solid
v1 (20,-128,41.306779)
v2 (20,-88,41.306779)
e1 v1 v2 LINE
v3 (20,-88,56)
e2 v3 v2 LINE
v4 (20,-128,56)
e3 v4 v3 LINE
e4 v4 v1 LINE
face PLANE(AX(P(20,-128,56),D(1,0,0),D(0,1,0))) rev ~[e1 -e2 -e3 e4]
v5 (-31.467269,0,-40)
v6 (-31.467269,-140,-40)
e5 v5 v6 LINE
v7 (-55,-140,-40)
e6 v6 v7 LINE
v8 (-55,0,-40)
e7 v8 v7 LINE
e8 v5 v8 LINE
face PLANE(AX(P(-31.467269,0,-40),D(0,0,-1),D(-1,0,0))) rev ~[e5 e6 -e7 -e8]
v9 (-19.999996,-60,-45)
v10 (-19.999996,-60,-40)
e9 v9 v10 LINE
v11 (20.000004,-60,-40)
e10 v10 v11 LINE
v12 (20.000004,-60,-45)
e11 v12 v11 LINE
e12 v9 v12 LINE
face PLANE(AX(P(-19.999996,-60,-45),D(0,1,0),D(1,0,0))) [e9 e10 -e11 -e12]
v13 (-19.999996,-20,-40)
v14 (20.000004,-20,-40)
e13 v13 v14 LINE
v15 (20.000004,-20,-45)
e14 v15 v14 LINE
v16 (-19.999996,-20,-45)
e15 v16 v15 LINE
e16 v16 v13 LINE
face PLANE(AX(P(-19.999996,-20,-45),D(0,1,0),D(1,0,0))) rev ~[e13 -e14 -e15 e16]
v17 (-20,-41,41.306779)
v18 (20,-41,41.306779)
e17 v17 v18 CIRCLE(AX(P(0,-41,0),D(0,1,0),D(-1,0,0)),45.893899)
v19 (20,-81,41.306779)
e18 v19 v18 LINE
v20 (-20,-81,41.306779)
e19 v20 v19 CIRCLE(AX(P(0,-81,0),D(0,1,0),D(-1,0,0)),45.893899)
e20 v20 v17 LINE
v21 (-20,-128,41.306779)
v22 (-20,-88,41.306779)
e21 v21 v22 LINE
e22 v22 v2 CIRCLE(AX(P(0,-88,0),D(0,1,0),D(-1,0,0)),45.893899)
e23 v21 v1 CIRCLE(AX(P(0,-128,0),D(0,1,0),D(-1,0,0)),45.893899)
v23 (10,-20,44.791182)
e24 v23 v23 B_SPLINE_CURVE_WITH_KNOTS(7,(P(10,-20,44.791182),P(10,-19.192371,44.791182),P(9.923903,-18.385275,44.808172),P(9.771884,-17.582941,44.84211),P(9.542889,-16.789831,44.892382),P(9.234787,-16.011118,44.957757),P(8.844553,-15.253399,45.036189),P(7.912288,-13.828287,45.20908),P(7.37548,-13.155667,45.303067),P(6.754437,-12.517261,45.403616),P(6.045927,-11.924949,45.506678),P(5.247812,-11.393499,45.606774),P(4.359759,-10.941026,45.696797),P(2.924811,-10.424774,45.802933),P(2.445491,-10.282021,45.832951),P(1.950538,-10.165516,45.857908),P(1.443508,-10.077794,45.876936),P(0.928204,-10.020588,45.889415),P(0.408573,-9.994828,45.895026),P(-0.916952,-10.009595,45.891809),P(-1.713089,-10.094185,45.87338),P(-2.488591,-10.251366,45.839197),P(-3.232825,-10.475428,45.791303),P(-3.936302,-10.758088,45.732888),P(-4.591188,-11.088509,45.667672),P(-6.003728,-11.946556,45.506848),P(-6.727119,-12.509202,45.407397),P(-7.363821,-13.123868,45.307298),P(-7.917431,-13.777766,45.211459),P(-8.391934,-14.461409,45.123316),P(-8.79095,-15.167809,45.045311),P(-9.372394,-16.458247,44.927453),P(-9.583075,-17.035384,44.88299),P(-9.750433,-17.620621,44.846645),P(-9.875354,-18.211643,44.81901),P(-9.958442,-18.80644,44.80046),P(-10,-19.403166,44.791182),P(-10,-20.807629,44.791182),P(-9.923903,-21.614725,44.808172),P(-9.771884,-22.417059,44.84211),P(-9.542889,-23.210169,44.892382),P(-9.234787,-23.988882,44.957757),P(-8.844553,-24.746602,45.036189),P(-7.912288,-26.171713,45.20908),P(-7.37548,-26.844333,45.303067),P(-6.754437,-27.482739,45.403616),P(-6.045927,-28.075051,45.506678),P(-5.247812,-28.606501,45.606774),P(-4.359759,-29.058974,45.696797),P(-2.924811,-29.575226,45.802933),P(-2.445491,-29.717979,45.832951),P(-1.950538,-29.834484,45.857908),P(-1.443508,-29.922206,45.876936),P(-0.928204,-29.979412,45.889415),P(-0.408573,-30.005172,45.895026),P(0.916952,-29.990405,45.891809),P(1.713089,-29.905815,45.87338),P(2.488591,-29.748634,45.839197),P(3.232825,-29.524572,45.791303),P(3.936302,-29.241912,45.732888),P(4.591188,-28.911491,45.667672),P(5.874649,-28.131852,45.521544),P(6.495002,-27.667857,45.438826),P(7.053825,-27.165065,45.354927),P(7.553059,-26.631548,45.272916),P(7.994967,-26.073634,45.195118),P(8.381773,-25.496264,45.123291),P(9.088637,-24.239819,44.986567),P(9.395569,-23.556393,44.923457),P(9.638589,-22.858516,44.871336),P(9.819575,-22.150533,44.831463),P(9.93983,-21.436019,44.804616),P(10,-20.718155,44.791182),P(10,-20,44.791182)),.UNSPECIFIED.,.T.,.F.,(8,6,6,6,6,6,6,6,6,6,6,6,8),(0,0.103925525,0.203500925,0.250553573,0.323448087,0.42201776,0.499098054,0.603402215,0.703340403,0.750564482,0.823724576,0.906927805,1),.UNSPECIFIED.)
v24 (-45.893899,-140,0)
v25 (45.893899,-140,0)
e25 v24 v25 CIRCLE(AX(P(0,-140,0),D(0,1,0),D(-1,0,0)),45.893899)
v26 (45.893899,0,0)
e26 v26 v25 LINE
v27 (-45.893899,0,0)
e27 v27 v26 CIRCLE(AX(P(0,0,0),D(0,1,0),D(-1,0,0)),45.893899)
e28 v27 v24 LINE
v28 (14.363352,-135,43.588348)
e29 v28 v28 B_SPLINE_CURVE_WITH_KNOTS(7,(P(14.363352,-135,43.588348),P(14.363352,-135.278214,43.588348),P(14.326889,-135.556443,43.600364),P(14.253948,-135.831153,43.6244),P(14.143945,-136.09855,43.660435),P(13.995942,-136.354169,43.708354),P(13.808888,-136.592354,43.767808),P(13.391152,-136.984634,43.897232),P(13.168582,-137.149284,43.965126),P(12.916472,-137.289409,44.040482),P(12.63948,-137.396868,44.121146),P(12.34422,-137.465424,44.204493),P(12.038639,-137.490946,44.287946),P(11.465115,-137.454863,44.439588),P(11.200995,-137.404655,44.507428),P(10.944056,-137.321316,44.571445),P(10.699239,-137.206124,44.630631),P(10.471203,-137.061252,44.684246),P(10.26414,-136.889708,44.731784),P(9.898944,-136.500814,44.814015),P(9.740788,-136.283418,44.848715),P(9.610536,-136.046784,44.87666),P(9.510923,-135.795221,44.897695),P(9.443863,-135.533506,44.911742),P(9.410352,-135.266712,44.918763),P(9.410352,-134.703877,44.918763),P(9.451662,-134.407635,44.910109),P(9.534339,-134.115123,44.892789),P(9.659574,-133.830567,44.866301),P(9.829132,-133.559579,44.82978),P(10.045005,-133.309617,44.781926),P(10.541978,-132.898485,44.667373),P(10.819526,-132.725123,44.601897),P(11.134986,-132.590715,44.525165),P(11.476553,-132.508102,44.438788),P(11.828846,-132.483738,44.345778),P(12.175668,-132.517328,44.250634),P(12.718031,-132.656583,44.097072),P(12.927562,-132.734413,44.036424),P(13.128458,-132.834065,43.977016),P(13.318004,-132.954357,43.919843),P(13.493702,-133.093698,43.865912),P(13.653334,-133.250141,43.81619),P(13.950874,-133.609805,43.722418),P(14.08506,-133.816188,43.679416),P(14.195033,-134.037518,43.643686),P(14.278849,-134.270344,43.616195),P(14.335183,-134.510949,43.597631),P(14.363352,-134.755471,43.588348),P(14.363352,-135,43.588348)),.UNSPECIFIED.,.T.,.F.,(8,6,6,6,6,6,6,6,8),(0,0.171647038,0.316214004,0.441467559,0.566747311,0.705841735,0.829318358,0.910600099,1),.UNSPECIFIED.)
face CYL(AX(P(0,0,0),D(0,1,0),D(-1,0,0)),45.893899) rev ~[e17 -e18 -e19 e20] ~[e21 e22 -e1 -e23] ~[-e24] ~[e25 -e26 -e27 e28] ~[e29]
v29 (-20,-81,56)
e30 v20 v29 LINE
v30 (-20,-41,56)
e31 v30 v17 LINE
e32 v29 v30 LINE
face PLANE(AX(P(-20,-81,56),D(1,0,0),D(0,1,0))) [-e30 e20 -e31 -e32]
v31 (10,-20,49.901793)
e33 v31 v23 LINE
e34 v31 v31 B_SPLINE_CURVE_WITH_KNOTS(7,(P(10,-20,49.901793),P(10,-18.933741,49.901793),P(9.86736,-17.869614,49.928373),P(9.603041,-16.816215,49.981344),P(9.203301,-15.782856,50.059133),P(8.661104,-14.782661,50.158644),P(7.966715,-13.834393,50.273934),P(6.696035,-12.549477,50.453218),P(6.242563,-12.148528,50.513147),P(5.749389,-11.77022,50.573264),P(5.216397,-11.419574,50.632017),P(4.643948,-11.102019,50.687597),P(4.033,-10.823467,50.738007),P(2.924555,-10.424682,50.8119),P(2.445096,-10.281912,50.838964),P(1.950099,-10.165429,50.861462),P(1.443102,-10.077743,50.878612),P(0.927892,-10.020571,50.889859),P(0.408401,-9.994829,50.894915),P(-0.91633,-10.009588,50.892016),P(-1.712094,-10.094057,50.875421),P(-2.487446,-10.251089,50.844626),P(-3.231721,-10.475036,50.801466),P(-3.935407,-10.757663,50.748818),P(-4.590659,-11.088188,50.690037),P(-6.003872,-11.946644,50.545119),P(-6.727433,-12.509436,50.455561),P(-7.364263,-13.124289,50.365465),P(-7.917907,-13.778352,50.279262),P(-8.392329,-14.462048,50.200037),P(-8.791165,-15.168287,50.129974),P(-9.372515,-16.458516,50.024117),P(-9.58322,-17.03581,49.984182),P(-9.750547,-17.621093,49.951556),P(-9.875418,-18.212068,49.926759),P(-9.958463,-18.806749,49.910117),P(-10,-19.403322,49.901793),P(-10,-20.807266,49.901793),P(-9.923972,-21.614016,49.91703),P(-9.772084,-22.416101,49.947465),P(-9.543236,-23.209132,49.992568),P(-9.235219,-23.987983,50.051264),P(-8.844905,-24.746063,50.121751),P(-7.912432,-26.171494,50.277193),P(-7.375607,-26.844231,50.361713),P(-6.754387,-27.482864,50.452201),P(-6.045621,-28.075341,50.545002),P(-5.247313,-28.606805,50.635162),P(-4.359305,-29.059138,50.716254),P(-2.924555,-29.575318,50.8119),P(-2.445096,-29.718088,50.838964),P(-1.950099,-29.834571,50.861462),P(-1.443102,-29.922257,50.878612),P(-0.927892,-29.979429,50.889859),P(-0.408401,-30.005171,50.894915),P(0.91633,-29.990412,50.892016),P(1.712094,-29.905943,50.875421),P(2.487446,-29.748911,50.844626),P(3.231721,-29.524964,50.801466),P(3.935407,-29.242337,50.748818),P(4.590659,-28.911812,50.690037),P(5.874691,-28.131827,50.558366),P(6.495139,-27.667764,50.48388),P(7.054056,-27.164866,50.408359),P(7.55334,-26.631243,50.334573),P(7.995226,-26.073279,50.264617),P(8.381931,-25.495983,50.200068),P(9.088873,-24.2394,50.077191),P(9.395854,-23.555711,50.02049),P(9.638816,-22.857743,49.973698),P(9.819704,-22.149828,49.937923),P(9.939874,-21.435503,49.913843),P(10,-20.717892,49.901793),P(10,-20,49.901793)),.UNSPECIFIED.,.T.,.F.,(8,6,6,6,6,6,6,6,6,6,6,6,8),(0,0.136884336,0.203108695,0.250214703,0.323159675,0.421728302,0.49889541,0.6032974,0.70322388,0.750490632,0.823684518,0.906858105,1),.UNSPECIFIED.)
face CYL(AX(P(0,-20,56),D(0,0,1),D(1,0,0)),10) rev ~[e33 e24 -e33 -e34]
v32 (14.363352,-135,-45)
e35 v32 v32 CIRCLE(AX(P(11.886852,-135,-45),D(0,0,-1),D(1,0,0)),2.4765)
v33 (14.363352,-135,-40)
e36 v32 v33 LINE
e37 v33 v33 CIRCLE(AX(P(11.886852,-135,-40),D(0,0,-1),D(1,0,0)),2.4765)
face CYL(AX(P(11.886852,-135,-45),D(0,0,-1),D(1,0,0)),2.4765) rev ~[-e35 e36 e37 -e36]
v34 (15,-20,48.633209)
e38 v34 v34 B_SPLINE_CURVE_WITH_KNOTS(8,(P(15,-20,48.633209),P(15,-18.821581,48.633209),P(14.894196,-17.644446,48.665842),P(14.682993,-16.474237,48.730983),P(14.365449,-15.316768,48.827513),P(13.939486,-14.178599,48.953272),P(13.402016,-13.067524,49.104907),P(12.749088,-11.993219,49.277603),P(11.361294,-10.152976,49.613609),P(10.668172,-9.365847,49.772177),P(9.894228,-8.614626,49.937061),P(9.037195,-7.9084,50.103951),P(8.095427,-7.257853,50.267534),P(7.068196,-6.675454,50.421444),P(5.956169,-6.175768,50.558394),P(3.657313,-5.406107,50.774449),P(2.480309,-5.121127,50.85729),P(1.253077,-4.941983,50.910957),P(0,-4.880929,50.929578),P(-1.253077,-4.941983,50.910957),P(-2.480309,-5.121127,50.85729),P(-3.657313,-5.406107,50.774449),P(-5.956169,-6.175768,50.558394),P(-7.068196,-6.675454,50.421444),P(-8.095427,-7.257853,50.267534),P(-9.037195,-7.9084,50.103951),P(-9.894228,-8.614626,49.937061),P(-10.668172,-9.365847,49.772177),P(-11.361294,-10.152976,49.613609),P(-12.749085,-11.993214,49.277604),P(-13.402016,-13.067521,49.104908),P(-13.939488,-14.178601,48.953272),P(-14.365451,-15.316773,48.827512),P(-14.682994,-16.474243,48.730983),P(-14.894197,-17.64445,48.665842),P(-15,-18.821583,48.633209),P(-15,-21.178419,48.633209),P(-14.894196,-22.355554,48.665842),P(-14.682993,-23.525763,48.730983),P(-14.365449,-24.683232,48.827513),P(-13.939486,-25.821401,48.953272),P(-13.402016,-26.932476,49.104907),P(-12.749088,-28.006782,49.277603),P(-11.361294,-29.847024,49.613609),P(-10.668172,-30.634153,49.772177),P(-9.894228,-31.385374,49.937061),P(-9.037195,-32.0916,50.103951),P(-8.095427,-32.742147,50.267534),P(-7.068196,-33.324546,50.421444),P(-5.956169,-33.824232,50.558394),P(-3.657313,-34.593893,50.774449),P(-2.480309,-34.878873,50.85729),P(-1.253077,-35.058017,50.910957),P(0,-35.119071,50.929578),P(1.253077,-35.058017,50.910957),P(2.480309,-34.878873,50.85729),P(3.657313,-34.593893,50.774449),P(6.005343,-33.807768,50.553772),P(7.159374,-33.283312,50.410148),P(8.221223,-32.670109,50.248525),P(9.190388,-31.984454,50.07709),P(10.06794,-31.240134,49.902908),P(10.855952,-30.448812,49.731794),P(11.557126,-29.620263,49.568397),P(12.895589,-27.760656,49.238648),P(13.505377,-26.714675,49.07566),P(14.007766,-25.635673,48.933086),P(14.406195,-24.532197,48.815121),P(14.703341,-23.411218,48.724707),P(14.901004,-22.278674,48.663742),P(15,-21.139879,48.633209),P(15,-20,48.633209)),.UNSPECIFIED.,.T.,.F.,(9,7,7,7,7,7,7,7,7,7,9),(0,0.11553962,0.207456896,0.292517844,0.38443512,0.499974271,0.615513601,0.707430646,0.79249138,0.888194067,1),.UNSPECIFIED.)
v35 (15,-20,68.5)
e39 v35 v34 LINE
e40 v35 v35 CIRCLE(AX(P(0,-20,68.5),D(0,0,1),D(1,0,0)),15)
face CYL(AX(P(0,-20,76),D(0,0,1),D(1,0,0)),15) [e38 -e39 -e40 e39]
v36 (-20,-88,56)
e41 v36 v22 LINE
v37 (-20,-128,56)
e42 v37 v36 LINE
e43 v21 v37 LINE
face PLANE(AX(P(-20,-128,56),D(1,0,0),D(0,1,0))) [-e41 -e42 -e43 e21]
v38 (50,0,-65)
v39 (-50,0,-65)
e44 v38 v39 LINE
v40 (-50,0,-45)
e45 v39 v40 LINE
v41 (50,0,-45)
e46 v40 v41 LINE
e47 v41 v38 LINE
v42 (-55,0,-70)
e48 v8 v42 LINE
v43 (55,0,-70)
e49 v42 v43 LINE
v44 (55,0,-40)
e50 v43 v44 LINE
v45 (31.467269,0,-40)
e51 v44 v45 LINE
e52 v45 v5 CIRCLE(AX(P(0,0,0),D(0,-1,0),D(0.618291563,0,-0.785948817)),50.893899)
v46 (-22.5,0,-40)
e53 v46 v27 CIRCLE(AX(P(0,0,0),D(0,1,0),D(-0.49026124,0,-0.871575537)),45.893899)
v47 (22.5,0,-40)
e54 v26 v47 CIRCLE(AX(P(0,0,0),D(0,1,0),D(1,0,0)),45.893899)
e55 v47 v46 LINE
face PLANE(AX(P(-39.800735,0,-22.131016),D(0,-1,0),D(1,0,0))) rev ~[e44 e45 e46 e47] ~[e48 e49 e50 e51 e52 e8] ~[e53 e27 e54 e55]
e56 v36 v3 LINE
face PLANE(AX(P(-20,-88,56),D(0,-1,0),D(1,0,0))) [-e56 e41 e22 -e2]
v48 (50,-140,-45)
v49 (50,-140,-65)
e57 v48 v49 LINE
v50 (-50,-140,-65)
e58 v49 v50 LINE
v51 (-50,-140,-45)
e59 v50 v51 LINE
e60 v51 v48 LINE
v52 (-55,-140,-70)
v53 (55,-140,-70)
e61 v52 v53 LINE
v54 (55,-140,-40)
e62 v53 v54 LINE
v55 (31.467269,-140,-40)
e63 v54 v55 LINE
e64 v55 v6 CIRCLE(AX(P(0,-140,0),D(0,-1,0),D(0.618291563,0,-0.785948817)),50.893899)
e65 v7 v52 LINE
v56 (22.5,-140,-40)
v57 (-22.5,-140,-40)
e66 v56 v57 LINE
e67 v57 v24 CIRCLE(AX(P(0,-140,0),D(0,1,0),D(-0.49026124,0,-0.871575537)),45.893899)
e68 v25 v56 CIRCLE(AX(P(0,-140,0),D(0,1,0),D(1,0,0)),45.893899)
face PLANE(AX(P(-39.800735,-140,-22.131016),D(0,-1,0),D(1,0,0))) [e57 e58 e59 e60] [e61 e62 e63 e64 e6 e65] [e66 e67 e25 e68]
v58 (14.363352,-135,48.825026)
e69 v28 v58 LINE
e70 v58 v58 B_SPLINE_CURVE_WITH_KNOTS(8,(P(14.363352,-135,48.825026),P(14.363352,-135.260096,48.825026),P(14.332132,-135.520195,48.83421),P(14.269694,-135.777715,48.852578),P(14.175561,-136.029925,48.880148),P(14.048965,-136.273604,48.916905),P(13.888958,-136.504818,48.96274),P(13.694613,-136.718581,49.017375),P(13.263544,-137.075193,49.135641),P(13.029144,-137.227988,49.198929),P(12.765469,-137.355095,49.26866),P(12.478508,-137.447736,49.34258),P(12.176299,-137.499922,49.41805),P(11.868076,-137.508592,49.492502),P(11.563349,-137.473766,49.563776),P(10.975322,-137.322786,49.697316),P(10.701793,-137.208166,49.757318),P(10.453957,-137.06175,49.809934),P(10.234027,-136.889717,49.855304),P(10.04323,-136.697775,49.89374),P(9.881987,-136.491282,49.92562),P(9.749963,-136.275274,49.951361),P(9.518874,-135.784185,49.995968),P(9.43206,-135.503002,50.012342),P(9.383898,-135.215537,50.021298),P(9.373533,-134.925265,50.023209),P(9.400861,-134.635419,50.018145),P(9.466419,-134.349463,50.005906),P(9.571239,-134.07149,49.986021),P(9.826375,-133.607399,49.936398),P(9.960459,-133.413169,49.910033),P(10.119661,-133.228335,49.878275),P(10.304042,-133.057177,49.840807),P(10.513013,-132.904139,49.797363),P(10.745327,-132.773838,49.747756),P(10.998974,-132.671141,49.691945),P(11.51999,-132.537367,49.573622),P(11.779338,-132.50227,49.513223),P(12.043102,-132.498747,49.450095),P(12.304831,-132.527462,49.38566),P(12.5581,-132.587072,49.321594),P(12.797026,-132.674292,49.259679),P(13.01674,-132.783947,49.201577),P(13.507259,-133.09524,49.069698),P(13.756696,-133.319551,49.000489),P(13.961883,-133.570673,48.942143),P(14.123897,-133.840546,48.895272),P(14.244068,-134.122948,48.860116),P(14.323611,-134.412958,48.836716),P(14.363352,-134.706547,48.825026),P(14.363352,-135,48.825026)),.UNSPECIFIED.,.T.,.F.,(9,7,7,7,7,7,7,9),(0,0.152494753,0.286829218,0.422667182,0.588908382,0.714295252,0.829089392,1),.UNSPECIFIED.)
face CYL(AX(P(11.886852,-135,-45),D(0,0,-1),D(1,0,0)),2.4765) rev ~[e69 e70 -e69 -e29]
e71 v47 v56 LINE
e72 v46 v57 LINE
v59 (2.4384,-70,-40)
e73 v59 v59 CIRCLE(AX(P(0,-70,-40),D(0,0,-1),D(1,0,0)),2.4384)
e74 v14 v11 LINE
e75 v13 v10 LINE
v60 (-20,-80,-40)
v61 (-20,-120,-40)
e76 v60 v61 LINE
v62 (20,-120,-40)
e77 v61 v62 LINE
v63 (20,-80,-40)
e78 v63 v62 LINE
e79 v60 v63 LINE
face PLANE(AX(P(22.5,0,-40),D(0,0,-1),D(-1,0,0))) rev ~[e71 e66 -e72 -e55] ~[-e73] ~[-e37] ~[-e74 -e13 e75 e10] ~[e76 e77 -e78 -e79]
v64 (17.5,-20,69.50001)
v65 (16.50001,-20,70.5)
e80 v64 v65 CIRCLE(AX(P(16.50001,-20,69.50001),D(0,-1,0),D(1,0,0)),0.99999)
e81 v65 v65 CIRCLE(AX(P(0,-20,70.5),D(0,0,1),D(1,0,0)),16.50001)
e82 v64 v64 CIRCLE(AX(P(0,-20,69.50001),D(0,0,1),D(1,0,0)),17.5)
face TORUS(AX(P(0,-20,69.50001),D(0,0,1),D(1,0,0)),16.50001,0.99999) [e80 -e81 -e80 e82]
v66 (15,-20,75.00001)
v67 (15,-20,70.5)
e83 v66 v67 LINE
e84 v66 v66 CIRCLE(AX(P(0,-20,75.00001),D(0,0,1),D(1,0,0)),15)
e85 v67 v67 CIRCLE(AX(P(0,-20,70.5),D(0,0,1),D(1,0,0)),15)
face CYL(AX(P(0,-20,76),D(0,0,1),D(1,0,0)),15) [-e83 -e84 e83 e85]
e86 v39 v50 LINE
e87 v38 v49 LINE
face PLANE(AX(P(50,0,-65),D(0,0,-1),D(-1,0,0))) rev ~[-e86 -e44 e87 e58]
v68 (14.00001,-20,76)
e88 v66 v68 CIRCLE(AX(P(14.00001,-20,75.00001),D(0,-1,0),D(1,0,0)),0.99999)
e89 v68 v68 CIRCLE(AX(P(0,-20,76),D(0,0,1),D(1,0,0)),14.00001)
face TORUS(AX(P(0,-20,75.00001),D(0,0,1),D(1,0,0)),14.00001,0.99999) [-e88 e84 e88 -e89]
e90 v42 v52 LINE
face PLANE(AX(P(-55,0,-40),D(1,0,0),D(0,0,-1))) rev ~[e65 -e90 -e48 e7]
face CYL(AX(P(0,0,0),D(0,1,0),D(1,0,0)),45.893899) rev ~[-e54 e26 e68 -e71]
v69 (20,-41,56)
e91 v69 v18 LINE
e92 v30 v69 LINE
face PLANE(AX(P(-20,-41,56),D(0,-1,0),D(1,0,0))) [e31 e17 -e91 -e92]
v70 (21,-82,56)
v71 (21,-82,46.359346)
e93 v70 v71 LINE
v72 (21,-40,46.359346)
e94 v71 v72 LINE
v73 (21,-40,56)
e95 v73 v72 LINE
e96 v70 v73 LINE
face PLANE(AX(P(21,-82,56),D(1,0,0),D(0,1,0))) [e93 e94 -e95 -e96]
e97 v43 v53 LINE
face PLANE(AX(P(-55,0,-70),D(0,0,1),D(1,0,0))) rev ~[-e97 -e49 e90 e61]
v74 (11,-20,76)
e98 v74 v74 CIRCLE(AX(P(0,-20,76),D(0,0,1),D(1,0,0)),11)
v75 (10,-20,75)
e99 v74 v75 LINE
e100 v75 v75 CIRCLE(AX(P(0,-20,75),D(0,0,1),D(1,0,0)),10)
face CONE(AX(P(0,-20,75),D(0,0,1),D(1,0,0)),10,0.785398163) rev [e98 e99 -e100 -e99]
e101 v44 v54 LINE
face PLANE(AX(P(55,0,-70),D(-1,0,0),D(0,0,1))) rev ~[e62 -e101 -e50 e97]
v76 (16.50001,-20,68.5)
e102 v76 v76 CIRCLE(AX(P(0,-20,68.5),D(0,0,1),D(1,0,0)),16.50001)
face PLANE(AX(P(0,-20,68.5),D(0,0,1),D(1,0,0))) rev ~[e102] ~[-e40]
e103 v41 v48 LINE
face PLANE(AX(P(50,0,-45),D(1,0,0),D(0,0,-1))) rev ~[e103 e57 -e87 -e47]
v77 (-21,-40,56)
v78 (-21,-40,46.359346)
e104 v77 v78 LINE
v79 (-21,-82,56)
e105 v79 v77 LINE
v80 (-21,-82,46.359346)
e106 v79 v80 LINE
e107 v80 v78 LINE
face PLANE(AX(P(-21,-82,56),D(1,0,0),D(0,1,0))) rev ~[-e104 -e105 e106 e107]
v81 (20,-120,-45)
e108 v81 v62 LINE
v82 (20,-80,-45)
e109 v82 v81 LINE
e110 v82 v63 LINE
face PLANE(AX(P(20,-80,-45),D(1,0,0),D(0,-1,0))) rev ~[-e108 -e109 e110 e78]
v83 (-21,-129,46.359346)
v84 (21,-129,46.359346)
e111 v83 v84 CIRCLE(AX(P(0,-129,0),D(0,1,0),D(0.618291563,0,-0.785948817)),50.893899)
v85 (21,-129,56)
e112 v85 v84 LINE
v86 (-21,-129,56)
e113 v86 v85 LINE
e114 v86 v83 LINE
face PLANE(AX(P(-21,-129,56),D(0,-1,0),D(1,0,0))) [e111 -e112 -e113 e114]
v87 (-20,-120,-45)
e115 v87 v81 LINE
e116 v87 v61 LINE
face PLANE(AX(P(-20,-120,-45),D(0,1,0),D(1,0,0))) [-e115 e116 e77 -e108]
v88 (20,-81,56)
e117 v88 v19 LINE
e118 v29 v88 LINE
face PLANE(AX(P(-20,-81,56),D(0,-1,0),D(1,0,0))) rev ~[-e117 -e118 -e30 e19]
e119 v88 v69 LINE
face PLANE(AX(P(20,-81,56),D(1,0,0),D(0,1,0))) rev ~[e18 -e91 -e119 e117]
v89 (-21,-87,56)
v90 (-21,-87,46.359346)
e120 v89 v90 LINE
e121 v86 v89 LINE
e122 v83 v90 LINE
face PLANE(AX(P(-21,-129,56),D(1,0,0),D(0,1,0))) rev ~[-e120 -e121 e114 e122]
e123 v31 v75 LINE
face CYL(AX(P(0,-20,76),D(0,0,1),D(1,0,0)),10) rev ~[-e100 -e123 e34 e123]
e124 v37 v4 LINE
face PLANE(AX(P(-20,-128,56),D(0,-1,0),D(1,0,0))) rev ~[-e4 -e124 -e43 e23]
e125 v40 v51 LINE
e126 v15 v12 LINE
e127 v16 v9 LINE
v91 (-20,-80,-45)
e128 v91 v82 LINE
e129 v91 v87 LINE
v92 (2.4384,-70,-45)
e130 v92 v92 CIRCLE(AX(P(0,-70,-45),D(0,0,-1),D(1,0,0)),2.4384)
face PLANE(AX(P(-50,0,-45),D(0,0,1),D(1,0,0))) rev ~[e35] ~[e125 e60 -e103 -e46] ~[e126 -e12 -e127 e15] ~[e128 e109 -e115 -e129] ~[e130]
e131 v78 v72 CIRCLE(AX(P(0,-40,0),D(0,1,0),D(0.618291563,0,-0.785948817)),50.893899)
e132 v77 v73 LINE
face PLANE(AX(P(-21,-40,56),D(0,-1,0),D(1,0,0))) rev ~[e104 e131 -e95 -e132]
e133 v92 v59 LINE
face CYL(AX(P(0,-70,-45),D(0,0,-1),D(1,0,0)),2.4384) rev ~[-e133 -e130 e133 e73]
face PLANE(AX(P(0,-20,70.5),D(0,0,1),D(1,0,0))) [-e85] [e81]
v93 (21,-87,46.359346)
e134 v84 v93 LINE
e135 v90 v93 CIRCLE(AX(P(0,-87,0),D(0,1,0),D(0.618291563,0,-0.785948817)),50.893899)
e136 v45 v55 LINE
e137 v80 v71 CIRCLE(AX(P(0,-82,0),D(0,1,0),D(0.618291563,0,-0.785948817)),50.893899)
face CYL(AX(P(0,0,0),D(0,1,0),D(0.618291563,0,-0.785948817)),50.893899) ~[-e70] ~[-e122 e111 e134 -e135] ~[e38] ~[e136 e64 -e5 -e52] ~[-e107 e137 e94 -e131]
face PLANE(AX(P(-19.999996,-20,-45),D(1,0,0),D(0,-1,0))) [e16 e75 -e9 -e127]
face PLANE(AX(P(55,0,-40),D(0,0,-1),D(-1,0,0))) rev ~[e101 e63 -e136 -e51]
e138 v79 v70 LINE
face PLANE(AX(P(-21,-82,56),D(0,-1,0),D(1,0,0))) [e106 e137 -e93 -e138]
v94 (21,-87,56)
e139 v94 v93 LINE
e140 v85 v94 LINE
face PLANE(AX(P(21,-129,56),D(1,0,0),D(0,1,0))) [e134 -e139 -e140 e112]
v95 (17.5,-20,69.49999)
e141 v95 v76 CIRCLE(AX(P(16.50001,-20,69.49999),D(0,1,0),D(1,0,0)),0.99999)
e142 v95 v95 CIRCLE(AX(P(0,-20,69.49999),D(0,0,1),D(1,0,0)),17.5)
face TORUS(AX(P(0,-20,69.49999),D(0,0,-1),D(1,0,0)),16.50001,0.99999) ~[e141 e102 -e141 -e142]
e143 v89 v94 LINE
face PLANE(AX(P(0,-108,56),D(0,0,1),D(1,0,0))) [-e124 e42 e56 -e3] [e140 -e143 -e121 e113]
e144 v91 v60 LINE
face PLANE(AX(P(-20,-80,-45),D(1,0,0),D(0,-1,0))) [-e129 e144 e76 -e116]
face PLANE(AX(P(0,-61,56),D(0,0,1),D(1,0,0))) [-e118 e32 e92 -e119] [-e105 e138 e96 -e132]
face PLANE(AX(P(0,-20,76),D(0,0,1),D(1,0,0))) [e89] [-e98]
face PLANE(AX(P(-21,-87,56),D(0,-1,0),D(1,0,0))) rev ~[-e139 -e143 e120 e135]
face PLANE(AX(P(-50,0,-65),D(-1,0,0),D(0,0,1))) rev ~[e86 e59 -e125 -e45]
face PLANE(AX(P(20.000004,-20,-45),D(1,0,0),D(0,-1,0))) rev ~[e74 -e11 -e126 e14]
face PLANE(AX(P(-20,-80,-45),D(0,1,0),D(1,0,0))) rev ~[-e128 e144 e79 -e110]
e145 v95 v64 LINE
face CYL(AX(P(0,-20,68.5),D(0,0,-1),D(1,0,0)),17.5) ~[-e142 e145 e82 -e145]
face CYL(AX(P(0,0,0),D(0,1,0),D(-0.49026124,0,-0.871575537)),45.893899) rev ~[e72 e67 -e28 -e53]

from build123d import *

# Parameters (mm, degrees)
F0_W      = 5
F0_H      = 5
F1_DEPTH  = 140
F5_R      = 15
F5_R_2    = 10
F6_DEPTH  = 30
F7_R      = 10
F8_DEPTH  = 25
F7_W      = 42
F7_H      = 42
F7_W_2    = 40
F7_H_2    = 40
F9_DEPTH  = 10
F10_DEPTH = 25
F11_W     = 40
F11_H     = 40
F11_R     = 2.4384
F11_R_2   = 2.4765
F12_DEPTH = 25
F13_DEPTH = 100
F15_R     = 17.5
F15_R_2   = 10
F16_DEPTH = 2
F17_R     = 0.99999
F18_SIZE  = 1


# Not quite as in the source:
# - a fillet or chamfer is up to 0.001 mm smaller than in the source, because OpenCascade refuses the exact size


with BuildPart() as f1:
    # F0 (on Front) → F1 (new body)
    with BuildSketch(Plane.XZ):
        with BuildLine():
            ThreePointArc((-22.5, -40), (-39.6160493738, -23.1693468188), (-45.8938993767, 0))
            Line((-45.8938993767, 0), (-50.8938993767, 0))
            ThreePointArc((-50.8938993767, 0), (-45.7803505669, -22.233949171), (-31.4672686099, -40))
            Line((-31.4672686099, -40), (-22.5, -40))
        make_face()
        with BuildLine():
            ThreePointArc((-9.0138781887, -45), (-15.954031767, -43.0316031583), (-22.5, -40))
            Line((-22.5, -40), (-31.4672686099, -40))
            ThreePointArc((-31.4672686099, -40), (-27.7333960958, -42.6737358894), (-23.7737038294, -45))
            Line((-23.7737038294, -45), (-9.0138781887, -45))
        make_face()
        with BuildLine():
            ThreePointArc((-45.8938993767, 0), (0, 45.8938993767), (45.8938993767, 0))
            Line((45.8938993767, 0), (50.8938993767, 0))
            ThreePointArc((50.8938993767, 0), (0, 50.8938993767), (-50.8938993767, 0))
            Line((-50.8938993767, 0), (-45.8938993767, 0))
        make_face()
        with BuildLine():
            Line((50.8938993767, 0), (45.8938993767, 0))
            ThreePointArc((45.8938993767, 0), (39.6160493738, -23.1693468188), (22.5, -40))
            Line((22.5, -40), (31.4672686099, -40))
            ThreePointArc((31.4672686099, -40), (45.7803505669, -22.233949171), (50.8938993767, 0))
        make_face()
        with Locations((-52.5, -67.5)):
            Rectangle(F0_W, F0_H)
        with BuildLine():
            ThreePointArc((-23.7737038294, -45), (-27.7333960958, -42.6737358894), (-31.4672686099, -40))
            Line((-31.4672686099, -40), (-55, -40))
            Line((-55, -40), (-55, -65))
            Line((-55, -65), (-50, -65))
            Line((-50, -65), (-50, -45))
            Line((-50, -45), (-23.7737038294, -45))
        make_face()
        with BuildLine():
            Line((55, -40), (31.4672686099, -40))
            ThreePointArc((31.4672686099, -40), (27.7333960958, -42.6737358894), (23.7737038294, -45))
            Line((23.7737038294, -45), (50, -45))
            Line((50, -45), (50, -65))
            Line((50, -65), (-50, -65))
            Line((-50, -65), (-50, -70))
            Line((-50, -70), (55, -70))
            Line((55, -70), (55, -40))
        make_face()
        with BuildLine():
            ThreePointArc((9.0138781887, -45), (15.954031767, -43.0316031583), (22.5, -40))
            Line((22.5, -40), (0, -40))
            Line((0, -40), (-22.5, -40))
            ThreePointArc((-22.5, -40), (-15.954031767, -43.0316031583), (-9.0138781887, -45))
            Line((-9.0138781887, -45), (9.0138781887, -45))
        make_face()
        with BuildLine():
            Line((31.4672686099, -40), (22.5, -40))
            ThreePointArc((22.5, -40), (15.954031767, -43.0316031583), (9.0138781887, -45))
            Line((9.0138781887, -45), (23.7737038294, -45))
            ThreePointArc((23.7737038294, -45), (27.7333960958, -42.6737358894), (31.4672686099, -40))
        make_face()
    extrude(amount=F1_DEPTH)

    # F5 (on offset) → F6 (join)
    with BuildSketch(Plane.XY.offset(76)):
        with Locations((0, -20)):
            Circle(F5_R)
        with Locations((0, -20)):
            Circle(F5_R_2, mode=Mode.SUBTRACT)
    extrude(amount=-F6_DEPTH)

    # F7 (on offset) → F8 (cut)
    with BuildSketch(Plane.XY.offset(56)):
        with Locations((0, -20)):
            Circle(F7_R)
    extrude(amount=-F8_DEPTH, mode=Mode.SUBTRACT)

    # F7 (on offset) → F9 (join)
    with BuildSketch(Plane.XY.offset(56)):
        with Locations((0, -61)):
            Rectangle(F7_W, F7_H)
        with Locations((0, -61)):
            Rectangle(F7_W_2, F7_H_2, mode=Mode.SUBTRACT)
        with Locations((0, -108)):
            Rectangle(F7_W, F7_H)
        with Locations((0, -108)):
            Rectangle(F7_W_2, F7_H_2, mode=Mode.SUBTRACT)
    extrude(amount=-F9_DEPTH)

    # F7 (on offset) → F10 (cut)
    with BuildSketch(Plane.XY.offset(56)):
        with Locations((0, -61)):
            Rectangle(F7_W_2, F7_H_2)
        with Locations((0, -108)):
            Rectangle(F7_W_2, F7_H_2)
    extrude(amount=-F10_DEPTH, mode=Mode.SUBTRACT)

    # F11 (on face) → F12 (cut)
    with BuildSketch(Plane(origin=(0, 0, -45), x_dir=(1, 0, 0), z_dir=(0, 0, -1))):
        with Locations((3.8294e-06, 40)):
            Rectangle(F11_W, F11_H)
        with Locations((0, 100)):
            Rectangle(F11_W, F11_H)
        with Locations((0, 70)):
            Circle(F11_R)
        with Locations((11.8868519147, 135)):
            Circle(F11_R_2)
    extrude(amount=-F12_DEPTH, mode=Mode.SUBTRACT)

    # F11 (on face) → F13 (cut)
    with BuildSketch(Plane(origin=(0, 0, -45), x_dir=(1, 0, 0), z_dir=(0, 0, -1))):
        with Locations((11.8868519147, 135)):
            Circle(F11_R_2)
    extrude(amount=-F13_DEPTH, mode=Mode.SUBTRACT)

    # F15 (on offset) → F16 (join)
    with BuildSketch(Plane.XY.offset(68.5)):
        with Locations((0, -20)):
            Circle(F15_R)
        with Locations((0, -20)):
            Circle(F15_R_2, mode=Mode.SUBTRACT)
    extrude(amount=F16_DEPTH)

    # F17 (radius 1 in the source; OpenCascade refuses exactly that, so slightly less here)
    f17_edges = [f1.edges().sort_by_distance(p)[0] for p in [
        (-17.5, -20, 70.5),
        (-17.5, -20, 68.5),
        (-15, -20, 76),
    ]]
    fillet(f17_edges, radius=F17_R)

    # F18
    f18_edges = [f1.edges().sort_by_distance(p)[0] for p in [
        (-10, -20, 76),
    ]]
    chamfer(f18_edges, length=F18_SIZE)


solid = f1.part
